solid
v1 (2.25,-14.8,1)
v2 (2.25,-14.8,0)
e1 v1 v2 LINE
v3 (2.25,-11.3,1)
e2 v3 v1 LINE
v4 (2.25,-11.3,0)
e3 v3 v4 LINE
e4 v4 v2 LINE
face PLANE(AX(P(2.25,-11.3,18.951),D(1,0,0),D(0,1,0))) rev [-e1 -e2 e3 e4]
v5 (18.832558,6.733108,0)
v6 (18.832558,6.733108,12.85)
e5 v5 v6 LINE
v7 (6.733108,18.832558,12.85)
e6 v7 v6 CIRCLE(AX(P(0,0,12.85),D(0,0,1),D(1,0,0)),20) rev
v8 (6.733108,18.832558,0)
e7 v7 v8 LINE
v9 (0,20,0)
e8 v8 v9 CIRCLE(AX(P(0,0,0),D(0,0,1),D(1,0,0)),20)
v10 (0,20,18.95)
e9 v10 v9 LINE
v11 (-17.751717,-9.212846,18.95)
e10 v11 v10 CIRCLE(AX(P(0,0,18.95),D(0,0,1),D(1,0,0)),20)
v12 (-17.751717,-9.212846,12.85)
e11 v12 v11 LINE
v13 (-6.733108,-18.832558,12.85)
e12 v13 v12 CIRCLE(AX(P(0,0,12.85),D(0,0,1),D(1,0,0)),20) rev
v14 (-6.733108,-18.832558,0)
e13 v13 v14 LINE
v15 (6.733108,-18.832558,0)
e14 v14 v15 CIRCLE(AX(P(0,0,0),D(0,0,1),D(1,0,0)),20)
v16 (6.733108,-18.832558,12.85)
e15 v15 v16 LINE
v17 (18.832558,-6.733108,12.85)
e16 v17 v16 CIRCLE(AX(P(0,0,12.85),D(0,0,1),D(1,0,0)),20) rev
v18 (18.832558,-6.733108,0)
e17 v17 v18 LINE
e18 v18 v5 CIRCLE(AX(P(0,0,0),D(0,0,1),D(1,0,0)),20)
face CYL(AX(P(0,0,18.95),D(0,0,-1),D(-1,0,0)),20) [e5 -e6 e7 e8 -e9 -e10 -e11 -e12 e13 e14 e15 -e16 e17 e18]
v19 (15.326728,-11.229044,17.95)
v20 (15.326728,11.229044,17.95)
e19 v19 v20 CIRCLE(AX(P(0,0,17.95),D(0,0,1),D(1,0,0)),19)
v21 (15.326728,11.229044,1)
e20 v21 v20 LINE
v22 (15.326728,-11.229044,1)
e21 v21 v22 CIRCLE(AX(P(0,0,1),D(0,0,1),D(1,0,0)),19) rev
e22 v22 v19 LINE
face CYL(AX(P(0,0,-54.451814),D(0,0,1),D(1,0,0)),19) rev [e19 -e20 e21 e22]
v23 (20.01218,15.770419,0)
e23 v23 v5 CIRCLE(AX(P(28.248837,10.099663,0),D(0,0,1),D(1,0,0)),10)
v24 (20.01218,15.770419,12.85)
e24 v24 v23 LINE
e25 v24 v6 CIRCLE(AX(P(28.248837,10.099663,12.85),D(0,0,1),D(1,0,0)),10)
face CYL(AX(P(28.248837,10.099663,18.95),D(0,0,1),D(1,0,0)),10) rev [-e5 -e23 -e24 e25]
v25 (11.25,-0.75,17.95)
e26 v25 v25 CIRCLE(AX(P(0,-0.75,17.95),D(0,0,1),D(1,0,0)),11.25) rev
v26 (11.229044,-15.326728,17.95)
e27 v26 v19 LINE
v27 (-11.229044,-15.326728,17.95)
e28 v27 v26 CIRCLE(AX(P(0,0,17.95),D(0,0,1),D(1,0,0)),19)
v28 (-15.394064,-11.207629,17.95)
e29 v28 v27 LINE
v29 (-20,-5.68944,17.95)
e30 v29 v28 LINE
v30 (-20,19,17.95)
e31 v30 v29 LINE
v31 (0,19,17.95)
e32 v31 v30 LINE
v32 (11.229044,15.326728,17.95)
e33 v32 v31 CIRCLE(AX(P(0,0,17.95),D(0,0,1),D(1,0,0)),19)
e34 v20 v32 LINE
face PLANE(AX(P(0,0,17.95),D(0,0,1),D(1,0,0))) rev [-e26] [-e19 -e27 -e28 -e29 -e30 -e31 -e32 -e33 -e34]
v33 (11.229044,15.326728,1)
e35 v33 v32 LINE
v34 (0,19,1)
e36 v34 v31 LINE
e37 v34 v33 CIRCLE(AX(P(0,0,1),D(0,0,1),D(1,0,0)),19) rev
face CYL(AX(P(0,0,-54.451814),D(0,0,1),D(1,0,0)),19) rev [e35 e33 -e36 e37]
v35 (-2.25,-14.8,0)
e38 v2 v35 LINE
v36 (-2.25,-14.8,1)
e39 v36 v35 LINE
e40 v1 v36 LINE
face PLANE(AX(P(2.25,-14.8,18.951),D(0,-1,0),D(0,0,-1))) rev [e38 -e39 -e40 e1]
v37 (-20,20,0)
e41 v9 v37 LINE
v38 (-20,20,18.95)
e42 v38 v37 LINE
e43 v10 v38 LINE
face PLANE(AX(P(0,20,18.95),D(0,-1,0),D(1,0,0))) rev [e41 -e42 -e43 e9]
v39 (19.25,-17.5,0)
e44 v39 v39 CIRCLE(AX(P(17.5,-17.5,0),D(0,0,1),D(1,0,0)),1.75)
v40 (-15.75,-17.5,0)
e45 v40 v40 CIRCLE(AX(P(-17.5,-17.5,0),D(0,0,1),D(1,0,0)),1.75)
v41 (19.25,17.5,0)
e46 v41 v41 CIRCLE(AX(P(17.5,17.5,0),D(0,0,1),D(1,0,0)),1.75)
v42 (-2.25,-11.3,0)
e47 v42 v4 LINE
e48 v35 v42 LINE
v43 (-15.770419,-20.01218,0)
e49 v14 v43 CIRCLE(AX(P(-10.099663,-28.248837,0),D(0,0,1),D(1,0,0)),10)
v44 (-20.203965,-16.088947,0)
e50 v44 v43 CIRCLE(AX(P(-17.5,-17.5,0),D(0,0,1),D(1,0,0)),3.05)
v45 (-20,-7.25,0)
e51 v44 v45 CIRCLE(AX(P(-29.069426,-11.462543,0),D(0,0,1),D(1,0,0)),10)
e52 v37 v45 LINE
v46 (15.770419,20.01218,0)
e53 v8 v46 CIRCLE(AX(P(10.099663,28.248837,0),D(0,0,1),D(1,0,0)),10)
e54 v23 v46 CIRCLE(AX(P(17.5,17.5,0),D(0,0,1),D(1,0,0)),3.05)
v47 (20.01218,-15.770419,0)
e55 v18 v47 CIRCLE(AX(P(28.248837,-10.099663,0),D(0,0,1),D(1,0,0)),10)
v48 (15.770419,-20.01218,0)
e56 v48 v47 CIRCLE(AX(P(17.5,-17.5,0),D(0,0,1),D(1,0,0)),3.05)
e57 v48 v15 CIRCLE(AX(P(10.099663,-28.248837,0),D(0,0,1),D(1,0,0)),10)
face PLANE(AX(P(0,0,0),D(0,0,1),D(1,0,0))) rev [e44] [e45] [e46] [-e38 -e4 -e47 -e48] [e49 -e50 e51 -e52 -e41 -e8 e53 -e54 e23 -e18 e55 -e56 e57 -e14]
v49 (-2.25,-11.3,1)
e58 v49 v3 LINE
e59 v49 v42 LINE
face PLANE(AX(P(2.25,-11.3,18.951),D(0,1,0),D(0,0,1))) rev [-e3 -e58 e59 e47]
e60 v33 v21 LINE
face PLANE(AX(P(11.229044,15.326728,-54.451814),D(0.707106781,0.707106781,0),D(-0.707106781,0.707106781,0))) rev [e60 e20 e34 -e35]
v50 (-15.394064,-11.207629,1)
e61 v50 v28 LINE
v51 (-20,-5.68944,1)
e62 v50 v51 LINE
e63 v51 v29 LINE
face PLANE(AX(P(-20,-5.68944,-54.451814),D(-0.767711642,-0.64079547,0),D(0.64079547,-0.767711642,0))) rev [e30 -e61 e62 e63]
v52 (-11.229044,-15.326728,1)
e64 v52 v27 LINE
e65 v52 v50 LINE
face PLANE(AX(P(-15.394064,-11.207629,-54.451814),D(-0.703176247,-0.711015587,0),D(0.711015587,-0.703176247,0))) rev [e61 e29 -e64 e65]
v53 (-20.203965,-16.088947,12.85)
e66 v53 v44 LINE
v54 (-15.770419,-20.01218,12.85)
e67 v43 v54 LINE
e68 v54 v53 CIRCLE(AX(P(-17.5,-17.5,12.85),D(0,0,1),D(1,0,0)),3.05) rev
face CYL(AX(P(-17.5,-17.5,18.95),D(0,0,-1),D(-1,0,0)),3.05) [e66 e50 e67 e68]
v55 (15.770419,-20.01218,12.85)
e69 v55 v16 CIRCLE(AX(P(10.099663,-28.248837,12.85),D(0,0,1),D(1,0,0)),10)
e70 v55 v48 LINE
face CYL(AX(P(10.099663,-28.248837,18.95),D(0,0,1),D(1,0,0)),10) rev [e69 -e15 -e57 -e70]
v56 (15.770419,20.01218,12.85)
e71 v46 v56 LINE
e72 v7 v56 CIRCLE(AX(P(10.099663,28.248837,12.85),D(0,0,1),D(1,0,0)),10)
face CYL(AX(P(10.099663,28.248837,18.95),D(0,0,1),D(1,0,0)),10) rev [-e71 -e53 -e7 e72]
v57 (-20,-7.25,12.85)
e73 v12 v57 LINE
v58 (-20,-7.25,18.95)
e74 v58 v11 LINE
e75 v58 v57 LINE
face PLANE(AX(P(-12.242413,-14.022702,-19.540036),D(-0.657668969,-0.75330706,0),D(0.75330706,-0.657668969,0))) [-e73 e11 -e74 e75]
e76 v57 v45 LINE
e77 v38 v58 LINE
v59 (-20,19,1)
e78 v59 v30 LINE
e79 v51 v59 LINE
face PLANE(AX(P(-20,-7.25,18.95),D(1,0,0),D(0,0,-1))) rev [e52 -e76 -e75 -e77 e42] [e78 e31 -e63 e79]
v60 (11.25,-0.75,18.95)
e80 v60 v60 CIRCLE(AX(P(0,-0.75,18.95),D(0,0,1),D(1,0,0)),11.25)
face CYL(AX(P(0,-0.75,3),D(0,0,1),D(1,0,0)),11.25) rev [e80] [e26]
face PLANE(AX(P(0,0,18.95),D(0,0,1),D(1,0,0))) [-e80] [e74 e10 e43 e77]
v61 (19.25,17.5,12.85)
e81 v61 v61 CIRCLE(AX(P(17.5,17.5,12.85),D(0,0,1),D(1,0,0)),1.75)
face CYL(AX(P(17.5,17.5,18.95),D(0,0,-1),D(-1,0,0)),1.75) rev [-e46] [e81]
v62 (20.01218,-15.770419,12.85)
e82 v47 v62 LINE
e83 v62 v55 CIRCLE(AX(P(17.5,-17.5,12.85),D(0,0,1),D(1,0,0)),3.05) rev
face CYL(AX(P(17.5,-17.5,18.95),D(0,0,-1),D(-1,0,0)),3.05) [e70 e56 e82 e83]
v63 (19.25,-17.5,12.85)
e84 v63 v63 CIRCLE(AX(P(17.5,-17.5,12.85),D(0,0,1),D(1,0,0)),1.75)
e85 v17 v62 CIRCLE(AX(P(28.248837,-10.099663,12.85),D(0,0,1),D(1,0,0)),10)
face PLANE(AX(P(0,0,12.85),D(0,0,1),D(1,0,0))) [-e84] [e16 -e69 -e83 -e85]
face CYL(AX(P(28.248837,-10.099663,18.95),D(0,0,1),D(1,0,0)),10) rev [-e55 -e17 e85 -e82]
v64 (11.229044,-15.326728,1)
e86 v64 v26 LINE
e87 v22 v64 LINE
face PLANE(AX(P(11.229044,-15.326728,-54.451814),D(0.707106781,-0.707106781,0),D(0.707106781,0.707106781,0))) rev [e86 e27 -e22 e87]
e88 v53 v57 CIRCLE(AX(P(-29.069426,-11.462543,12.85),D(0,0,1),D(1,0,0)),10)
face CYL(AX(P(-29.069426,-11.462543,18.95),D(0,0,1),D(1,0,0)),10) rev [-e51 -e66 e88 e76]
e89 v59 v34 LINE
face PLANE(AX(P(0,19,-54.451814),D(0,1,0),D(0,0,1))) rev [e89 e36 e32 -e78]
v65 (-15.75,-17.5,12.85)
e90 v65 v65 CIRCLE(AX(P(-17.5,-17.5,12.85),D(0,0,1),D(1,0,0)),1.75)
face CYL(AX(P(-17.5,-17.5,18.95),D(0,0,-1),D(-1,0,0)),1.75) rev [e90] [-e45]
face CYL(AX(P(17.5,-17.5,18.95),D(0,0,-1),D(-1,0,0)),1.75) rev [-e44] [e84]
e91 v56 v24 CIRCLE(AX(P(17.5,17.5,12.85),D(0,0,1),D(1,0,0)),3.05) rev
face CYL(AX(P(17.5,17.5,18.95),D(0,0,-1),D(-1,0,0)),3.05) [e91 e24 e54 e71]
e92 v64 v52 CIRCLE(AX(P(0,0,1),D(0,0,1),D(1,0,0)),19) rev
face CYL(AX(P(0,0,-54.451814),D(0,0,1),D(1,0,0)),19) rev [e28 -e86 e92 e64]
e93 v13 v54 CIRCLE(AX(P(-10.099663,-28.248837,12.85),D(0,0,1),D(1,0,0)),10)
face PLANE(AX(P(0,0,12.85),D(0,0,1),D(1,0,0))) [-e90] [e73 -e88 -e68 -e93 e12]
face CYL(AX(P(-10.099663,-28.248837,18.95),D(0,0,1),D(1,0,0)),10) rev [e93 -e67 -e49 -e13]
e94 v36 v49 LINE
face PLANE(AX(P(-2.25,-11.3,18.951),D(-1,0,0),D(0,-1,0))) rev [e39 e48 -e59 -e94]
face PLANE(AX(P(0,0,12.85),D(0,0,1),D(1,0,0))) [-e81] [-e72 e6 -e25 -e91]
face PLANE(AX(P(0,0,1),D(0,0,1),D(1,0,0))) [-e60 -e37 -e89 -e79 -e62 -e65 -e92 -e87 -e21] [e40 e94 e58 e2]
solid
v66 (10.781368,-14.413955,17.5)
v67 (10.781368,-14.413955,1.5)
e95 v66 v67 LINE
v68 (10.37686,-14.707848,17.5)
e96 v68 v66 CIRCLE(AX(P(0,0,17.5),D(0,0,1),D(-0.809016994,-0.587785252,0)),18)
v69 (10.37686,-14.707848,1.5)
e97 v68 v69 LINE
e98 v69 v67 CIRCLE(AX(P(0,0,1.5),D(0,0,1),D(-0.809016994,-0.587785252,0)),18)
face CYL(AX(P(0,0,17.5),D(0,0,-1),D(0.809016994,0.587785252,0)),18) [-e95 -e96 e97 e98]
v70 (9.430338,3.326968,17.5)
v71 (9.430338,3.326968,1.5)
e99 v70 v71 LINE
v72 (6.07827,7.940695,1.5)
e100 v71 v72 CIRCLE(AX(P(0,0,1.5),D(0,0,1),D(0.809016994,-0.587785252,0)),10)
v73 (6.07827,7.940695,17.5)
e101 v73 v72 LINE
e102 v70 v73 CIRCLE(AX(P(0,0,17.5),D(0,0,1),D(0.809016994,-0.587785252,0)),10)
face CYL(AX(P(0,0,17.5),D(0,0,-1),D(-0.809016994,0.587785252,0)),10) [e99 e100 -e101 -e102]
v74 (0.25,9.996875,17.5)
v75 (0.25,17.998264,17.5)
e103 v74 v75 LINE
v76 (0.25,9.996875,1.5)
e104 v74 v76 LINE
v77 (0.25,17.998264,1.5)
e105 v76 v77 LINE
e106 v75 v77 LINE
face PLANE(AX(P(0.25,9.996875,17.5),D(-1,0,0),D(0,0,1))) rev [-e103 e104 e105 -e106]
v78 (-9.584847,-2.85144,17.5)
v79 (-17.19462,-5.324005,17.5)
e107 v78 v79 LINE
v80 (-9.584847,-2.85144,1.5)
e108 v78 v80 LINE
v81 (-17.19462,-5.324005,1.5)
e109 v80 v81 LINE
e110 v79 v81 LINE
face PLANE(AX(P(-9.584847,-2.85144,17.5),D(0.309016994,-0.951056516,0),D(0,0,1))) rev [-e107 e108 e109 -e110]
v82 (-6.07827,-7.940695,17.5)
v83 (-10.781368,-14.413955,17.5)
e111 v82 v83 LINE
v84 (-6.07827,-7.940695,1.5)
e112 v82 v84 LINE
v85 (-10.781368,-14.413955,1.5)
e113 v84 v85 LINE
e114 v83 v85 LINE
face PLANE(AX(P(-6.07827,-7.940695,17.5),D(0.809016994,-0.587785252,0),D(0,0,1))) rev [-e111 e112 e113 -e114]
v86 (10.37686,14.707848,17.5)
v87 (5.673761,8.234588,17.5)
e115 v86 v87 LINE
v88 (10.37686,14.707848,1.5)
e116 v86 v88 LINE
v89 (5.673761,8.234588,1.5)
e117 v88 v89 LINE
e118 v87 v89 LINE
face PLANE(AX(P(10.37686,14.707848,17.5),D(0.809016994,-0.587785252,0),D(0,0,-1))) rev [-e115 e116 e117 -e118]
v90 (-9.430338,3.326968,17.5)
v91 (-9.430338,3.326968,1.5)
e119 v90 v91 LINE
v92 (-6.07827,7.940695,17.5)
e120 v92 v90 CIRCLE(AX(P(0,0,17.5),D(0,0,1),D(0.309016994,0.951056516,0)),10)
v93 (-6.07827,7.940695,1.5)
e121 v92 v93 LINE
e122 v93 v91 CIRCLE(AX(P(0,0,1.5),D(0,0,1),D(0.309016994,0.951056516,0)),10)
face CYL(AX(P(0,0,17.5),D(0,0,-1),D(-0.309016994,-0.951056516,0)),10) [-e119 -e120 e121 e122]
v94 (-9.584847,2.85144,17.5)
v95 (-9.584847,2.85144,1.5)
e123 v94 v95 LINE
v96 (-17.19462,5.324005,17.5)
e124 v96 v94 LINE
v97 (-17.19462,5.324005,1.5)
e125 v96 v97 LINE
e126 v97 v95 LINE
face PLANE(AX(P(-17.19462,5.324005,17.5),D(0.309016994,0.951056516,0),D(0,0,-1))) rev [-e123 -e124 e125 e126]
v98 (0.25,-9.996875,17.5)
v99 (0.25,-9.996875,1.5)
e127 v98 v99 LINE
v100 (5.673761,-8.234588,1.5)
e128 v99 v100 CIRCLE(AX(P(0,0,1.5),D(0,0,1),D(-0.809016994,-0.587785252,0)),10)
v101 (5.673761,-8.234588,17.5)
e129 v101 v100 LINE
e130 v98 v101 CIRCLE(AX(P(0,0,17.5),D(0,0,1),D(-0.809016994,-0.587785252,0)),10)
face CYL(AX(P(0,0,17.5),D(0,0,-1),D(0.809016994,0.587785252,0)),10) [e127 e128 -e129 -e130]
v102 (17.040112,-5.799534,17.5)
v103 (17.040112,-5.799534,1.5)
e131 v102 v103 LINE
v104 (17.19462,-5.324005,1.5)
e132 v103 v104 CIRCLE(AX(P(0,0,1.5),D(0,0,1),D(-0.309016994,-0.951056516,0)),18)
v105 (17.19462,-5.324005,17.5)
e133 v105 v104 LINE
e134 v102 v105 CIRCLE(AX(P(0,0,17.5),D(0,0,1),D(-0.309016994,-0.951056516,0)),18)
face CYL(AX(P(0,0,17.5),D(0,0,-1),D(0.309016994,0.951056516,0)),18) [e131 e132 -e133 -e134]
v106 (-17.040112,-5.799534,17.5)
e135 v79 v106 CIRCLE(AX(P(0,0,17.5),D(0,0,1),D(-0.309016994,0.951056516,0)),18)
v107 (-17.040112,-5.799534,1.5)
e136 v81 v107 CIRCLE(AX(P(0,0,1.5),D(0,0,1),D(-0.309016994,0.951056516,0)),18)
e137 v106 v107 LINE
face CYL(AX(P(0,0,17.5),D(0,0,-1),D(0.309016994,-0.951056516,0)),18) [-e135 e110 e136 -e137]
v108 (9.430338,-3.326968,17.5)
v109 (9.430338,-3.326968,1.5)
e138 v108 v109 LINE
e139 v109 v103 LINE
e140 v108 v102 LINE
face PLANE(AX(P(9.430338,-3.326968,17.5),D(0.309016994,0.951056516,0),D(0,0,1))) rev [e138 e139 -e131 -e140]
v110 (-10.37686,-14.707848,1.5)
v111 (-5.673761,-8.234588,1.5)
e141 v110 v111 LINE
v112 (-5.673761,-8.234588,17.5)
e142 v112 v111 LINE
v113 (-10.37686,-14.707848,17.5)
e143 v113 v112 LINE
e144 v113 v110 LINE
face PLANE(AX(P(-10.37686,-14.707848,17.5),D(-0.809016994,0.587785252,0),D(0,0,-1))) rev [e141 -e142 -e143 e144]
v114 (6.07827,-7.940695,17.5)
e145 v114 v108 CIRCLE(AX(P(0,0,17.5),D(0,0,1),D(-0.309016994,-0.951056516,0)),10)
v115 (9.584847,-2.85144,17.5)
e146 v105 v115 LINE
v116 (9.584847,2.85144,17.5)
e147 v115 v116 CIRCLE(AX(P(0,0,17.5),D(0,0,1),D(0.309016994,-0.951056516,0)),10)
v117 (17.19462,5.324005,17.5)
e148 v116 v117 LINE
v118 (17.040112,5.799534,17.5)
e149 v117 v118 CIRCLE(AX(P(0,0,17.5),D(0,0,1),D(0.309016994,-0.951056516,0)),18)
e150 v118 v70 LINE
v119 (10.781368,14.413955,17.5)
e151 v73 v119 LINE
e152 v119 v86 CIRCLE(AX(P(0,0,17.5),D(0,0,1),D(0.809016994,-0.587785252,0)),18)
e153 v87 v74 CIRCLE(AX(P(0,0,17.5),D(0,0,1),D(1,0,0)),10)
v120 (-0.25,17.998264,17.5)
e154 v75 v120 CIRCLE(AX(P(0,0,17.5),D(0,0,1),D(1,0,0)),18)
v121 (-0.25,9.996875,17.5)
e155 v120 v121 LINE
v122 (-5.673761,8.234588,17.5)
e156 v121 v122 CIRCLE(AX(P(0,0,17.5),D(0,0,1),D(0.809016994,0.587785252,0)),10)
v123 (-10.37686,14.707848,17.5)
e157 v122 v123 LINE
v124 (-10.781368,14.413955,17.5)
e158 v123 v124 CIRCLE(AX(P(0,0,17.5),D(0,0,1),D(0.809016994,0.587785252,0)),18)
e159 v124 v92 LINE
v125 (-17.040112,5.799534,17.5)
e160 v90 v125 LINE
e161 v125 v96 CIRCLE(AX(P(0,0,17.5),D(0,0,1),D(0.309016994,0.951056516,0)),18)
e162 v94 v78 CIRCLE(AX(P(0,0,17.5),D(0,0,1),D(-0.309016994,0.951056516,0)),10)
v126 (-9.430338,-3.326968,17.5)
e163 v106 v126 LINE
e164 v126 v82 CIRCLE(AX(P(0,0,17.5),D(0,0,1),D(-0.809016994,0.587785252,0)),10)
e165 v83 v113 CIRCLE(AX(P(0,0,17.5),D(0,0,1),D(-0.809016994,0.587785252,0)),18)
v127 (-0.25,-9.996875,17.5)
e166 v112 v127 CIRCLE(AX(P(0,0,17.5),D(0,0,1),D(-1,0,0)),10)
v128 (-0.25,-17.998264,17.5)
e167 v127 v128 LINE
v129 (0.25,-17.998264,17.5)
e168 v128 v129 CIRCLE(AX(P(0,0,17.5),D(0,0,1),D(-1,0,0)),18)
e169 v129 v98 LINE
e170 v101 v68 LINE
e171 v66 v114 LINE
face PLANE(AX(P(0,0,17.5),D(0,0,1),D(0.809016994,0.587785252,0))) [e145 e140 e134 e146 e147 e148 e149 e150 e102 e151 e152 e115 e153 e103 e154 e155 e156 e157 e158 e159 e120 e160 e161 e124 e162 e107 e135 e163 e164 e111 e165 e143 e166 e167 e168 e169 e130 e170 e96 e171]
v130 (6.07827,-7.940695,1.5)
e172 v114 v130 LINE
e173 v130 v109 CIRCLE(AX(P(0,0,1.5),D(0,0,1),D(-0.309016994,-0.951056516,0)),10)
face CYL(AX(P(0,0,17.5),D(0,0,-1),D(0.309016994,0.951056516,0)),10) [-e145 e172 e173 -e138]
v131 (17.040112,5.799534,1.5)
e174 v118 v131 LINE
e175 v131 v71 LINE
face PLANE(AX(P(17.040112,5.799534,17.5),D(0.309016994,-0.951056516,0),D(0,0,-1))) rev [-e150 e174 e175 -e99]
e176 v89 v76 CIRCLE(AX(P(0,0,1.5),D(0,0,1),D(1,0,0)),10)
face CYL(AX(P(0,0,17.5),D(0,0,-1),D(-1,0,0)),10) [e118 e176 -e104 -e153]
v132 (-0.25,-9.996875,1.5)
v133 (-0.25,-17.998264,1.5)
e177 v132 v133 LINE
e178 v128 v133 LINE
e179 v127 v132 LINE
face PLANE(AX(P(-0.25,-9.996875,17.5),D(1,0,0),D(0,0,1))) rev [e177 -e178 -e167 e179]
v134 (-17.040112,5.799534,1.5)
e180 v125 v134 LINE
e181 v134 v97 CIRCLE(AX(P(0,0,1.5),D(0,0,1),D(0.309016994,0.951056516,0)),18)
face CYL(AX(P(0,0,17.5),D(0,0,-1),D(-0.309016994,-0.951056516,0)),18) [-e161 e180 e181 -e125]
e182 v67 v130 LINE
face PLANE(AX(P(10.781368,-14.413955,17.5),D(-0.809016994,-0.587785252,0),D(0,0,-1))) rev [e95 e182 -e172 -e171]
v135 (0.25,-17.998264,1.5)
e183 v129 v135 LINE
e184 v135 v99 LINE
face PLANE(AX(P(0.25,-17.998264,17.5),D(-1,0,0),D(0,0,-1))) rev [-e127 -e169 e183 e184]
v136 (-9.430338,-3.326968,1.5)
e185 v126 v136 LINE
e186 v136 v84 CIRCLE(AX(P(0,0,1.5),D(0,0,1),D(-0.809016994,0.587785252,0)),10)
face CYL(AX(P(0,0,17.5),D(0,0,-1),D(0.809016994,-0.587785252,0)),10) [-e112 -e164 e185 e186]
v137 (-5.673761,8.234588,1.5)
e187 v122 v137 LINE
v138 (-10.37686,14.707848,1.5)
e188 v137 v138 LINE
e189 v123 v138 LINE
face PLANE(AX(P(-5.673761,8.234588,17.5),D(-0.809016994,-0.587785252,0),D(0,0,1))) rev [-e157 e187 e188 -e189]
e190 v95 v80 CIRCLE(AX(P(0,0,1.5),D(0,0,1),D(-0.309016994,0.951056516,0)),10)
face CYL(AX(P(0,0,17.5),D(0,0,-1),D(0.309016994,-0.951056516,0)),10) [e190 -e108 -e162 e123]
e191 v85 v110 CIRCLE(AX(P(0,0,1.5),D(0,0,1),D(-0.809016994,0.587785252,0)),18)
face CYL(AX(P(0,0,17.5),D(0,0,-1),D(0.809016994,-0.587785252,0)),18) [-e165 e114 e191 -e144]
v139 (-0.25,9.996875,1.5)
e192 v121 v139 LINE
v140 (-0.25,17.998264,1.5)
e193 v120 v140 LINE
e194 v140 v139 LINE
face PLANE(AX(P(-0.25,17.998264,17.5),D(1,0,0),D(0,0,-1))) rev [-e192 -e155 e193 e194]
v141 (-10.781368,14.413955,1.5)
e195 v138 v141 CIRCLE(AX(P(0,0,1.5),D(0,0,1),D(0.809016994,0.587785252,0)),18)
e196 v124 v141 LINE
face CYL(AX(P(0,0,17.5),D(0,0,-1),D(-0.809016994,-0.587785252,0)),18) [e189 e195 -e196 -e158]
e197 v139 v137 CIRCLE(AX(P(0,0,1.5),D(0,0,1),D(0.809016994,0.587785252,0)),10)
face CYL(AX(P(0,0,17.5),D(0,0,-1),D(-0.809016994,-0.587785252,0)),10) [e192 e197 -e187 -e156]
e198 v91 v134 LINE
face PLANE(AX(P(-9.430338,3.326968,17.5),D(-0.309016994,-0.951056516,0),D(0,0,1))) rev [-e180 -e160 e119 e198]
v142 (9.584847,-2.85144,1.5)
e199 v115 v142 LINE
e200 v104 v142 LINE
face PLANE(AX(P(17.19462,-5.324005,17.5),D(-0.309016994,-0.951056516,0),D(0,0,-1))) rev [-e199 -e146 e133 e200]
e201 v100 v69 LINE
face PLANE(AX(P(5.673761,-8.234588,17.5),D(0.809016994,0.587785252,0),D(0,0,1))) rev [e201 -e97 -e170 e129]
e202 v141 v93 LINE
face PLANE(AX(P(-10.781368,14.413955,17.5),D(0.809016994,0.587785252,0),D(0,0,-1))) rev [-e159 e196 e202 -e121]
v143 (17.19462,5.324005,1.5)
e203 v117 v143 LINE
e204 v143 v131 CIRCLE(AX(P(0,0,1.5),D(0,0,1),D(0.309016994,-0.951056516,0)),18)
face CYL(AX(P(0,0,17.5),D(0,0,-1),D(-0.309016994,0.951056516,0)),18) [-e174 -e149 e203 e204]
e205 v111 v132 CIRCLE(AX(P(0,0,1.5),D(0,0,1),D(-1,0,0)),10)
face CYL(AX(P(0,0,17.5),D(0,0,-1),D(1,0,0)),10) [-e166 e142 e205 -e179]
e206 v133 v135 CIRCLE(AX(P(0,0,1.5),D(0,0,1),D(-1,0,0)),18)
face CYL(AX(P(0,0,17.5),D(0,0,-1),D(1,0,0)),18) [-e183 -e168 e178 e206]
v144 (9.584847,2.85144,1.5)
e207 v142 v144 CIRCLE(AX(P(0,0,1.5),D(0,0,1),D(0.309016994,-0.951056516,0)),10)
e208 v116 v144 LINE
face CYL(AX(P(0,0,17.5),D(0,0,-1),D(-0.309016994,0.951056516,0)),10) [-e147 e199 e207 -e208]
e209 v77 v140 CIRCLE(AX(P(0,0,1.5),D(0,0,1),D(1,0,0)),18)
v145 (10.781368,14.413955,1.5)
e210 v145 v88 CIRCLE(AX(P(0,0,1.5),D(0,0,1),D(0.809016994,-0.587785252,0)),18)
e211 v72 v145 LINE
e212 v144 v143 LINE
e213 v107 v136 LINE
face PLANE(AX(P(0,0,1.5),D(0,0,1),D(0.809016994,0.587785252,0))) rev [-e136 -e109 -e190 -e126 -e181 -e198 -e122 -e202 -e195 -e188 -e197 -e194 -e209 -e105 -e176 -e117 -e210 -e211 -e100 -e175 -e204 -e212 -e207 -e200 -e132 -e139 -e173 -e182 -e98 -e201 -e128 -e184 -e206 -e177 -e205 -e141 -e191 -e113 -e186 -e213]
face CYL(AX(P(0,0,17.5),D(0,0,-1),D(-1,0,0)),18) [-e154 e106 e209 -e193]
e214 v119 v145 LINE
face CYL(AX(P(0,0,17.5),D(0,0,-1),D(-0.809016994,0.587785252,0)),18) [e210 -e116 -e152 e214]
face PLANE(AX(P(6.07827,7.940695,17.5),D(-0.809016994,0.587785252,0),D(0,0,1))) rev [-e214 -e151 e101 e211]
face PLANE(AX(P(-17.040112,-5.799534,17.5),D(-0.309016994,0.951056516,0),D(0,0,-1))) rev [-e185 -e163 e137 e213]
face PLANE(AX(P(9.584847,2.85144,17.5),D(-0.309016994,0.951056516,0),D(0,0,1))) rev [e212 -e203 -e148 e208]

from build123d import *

# Parameters (mm, degrees)
CROQUIS1_R              = 1.75
SALIENTE_EXTRUIR1_DEPTH = 18.95
CROQUIS2_R              = 11.25
CORTAR_EXTRUIR1_DEPTH   = 15.95
CORTAR_EXTRUIR2_DEPTH   = 16.95
REDONDEO1_R             = 10
CORTAR_EXTRUIR3_START   = -6.1
CROQUIS4_R              = 1.75
CORTAR_EXTRUIR3_DEPTH   = 6.1
CORTAR_EXTRUIR4_REACH   = 36.694
CROQUIS7_W              = 4.5
CROQUIS7_H              = 3.5
SALIENTE_EXTRUIR2_START = 0.5
SALIENTE_EXTRUIR2_DEPTH = 16
MATRIZC1_COUNT          = 10


with BuildPart() as part:
    # Croquis1 → Saliente-Extruir1 (new body)
    with BuildSketch(Plane.XY):
        with BuildLine():
            Line((0, 20), (-20, 20))
            Line((-20, 20), (-20, -7.25))
            Line((-20, -7.25), (-16.161775697, -11.848424332))
            Line((-16.161775697, -11.848424332), (-19.656675683, -15.343324317))
            ThreePointArc((-19.656675683, -15.343324317), (-19.656675683, -19.656675683), (-15.343324317, -19.656675683))
            Line((-15.343324317, -19.656675683), (-11.820046036, -16.133397401))
            ThreePointArc((-11.820046036, -16.133397401), (0, -20), (11.820046036, -16.133397401))
            Line((11.820046036, -16.133397401), (15.343324317, -19.656675683))
            ThreePointArc((15.343324317, -19.656675683), (19.656675683, -19.656675683), (19.656675683, -15.343324317))
            Line((19.656675683, -15.343324317), (16.133397401, -11.820046036))
            ThreePointArc((16.133397401, -11.820046036), (20, 0), (16.133397401, 11.820046036))
            Line((16.133397401, 11.820046036), (19.656675683, 15.343324317))
            ThreePointArc((19.656675683, 15.343324317), (19.656675683, 19.656675683), (15.343324317, 19.656675683))
            Line((15.343324317, 19.656675683), (11.820046036, 16.133397401))
            ThreePointArc((11.820046036, 16.133397401), (6.218201186, 19.008786758), (0, 20))
        make_face()
        with Locations((17.5, 17.5)):
            Circle(CROQUIS1_R, mode=Mode.SUBTRACT)
        with Locations((17.5, -17.5)):
            Circle(CROQUIS1_R, mode=Mode.SUBTRACT)
        with Locations((-17.5, -17.5)):
            Circle(CROQUIS1_R, mode=Mode.SUBTRACT)
    extrude(amount=SALIENTE_EXTRUIR1_DEPTH)

    # Croquis2 → Cortar-Extruir1 (cut)
    with BuildSketch(Plane.XY.offset(18.95)):
        with Locations((0, -0.75)):
            Circle(CROQUIS2_R)
    extrude(amount=-CORTAR_EXTRUIR1_DEPTH, mode=Mode.SUBTRACT)

    # Croquis3 → Cortar-Extruir2 (cut)
    with BuildSketch(Plane.XY.offset(17.95)):
        with BuildLine():
            Line((-20, 19), (-20, -5.689439655))
            Line((-20, -5.689439655), (-15.394064055, -11.207628862))
            Line((-15.394064055, -11.207628862), (-11.229043734, -15.326727531))
            ThreePointArc((-11.229043734, -15.326727531), (0, -19), (11.229043734, -15.326727531))
            Line((11.229043734, -15.326727531), (15.326727531, -11.229043734))
            ThreePointArc((15.326727531, -11.229043734), (19, 0), (15.326727531, 11.229043734))
            Line((15.326727531, 11.229043734), (11.229043734, 15.326727531))
            ThreePointArc((11.229043734, 15.326727531), (5.907291127, 18.05834742), (0, 19))
            Line((0, 19), (-20, 19))
        make_face()
    extrude(amount=-CORTAR_EXTRUIR2_DEPTH, mode=Mode.SUBTRACT)

    # Redondeo1
    # the kernel refuses this fillet: 10 mm, written as the material it adds along each edge
    with BuildSketch(Plane(origin=(11.820046036, 16.133397401, 0), x_dir=(0.7135427704128318, 0.700611671892198, 0), z_dir=(0, 0, 1)), Plane(origin=(-11.820046036, -16.133397401, 0), x_dir=(-0.7135427704128318, -0.7006116718921981, 0), z_dir=(0, 0, 1)), Plane(origin=(16.133397401, -11.820046036, 0), x_dir=(0.700611671892198, -0.7135427704128318, 0), z_dir=(0, 0, 1))) as redondeo1_piece_1:
        with BuildLine():
            CenterArc((7.26065151, 9.850205373), REDONDEO1_R, 205.850666245, 54.219788289)
            Line((-1.738683967, 5.489934627), (-2.638617515, 5.053907553))
            ThreePointArc((-2.638617515, 5.053907553), (-1.624046999, 2.505949256), (-0.986867746, -0.161530343))
            Line((-0.986867746, -0.161530343), (0.009143667, -0.999958196))
            ThreePointArc((0.009143667, -0.999958196), (4.991603301, -0.954398337), (5.363843801, -0.985020537))
            Line((5.363843801, -0.985020537), (5.536280865, 0))
        make_face()
    extrude(amount=18.95)
    with BuildSketch(Plane(origin=(-16.161775697, -11.848424332, 0), x_dir=(-0.6407954702389175, 0.7677116420383924, 0), z_dir=(0, 0, 1))) as redondeo1_piece_2_section:
        with BuildLine():
            CenterArc((8.567409361, 9.662082083), REDONDEO1_R, 202.59121969, 52.471420127)
            Line((-0.665281617, 5.820543678), (-1.588550714, 5.436389838))
            ThreePointArc((-1.588550714, 5.436389838), (-1.439524257, 4.832848201), (-0.99596493, -0.089743286))
            Line((-0.99596493, -0.089743286), (0, -1))
            ThreePointArc((0, -1), (2.994890321, -1), (5.73201777, -0.966208208))
            Line((5.73201777, -0.966208208), (5.989780642, 0))
        make_face()
    redondeo1_piece_2 = extrude(amount=18.95, mode=Mode.PRIVATE)
    redondeo1_piece_2 = split(redondeo1_piece_2, bisect_by=Plane(origin=(-17.114557991, -9.506104322, 0.5), z_dir=(-0.7031762473130518, -0.7110155871812753, 0)), keep=Keep.TOP, mode=Mode.PRIVATE)
    add(redondeo1_piece_2)
    with BuildSketch(Plane(origin=(11.820046036, -16.133397401, 0), x_dir=(-0.8833512154109235, -0.4687116706804344, 0), z_dir=(0, 0, 1))) as redondeo1_piece_3:
        with BuildLine():
            CenterArc((7.198350956, 9.895824864), REDONDEO1_R, 207.502745576, 54.219788289)
            Line((-1.671536099, 5.277913687), (-2.558524804, 4.81612257))
            ThreePointArc((-2.558524804, 4.81612257), (-2.416943338, 4.470499368), (-0.956052835, -0.293194434))
            Line((-0.956052835, -0.293194434), (0.143967019, -0.989582486))
            ThreePointArc((0.143967019, -0.989582486), (2.879340382, -0.791649728), (5.614713746, -0.989582486))
            Line((5.614713746, -0.989582486), (5.758680765, 0))
        make_face()
    extrude(amount=18.95)
    with BuildSketch(Plane(origin=(16.133397401, 11.820046036, 0), x_dir=(0.7006116718921972, 0.7135427704128325, 0), z_dir=(0, 0, 1))) as redondeo1_piece_4:
        with BuildLine():
            CenterArc((7.26065151, -9.850205373), REDONDEO1_R, 99.929545466, 54.219788289)
            Line((-1.738683967, -5.489934627), (-2.638617515, -5.053907553))
            ThreePointArc((-2.638617515, -5.053907553), (-1.624046999, -2.505949256), (-0.986867746, 0.161530343))
            Line((-0.986867746, 0.161530343), (0.009143667, 0.999958196))
            ThreePointArc((0.009143667, 0.999958196), (4.991603301, 0.954398337), (5.363843801, 0.985020537))
            Line((5.363843801, 0.985020537), (5.536280865, 0))
        make_face()
    extrude(amount=18.95)

    # Croquis4 → Cortar-Extruir3 (cut)
    # profile 1 of 3: a face of its own
    with BuildSketch(Plane.XY.offset(18.95).offset(CORTAR_EXTRUIR3_START)):
        with BuildLine():
            Line((-17.751717357, -9.21284597), (-20, -7.25))
            ThreePointArc((-20, -7.25), (-19.072087099, -11.69323902), (-20.203965396, -16.088946798))
            ThreePointArc((-20.203965396, -16.088946798), (-19.521211718, -19.784119785), (-15.770419222, -20.012180394))
            ThreePointArc((-15.770419222, -20.012180394), (-11.393963282, -18.332951904), (-6.733108383, -18.832558283))
            ThreePointArc((-6.733108383, -18.832558283), (-13.153379381, -15.066141207), (-17.751717357, -9.21284597))
        make_face()
        with Locations((-17.5, -17.5)):
            Circle(CROQUIS4_R, mode=Mode.SUBTRACT)
    # profile 2 of 3: a face of its own
    with BuildSketch(Plane.XY.offset(18.95).offset(CORTAR_EXTRUIR3_START)):
        with BuildLine():
            ThreePointArc((18.832558283, -6.733108383), (14.142135624, -14.142135624), (6.733108383, -18.832558283))
            ThreePointArc((6.733108383, -18.832558283), (11.393963282, -18.332951904), (15.770419222, -20.012180394))
            ThreePointArc((15.770419222, -20.012180394), (19.656675683, -19.656675683), (20.012180394, -15.770419222))
            ThreePointArc((20.012180394, -15.770419222), (18.332951904, -11.393963282), (18.832558283, -6.733108383))
        make_face()
        with Locations((17.5, -17.5)):
            Circle(CROQUIS4_R, mode=Mode.SUBTRACT)
    # profile 3 of 3: a face of its own
    with BuildSketch(Plane.XY.offset(18.95).offset(CORTAR_EXTRUIR3_START)):
        with BuildLine():
            ThreePointArc((15.770419222, 20.012180394), (11.393963282, 18.332951904), (6.733108383, 18.832558283))
            ThreePointArc((6.733108383, 18.832558283), (14.142135624, 14.142135624), (18.832558283, 6.733108383))
            ThreePointArc((18.832558283, 6.733108383), (18.332951904, 11.393963282), (20.012180394, 15.770419222))
            ThreePointArc((20.012180394, 15.770419222), (19.656675683, 19.656675683), (15.770419222, 20.012180394))
        make_face()
        with Locations((17.5, 17.5)):
            Circle(CROQUIS4_R, mode=Mode.SUBTRACT)
    extrude(amount=CORTAR_EXTRUIR3_DEPTH, mode=Mode.SUBTRACT)

    # Croquis7 → Cortar-Extruir4 (cut, up to next)
    with BuildSketch(Plane(origin=(0, 0, 0), x_dir=(-1, 0, 0), z_dir=(0, 0, -1)), mode=Mode.PRIVATE) as cortar_extruir4_sk1:
        with Locations((0, -13.05)):
            Rectangle(CROQUIS7_W, CROQUIS7_H)
    cortar_extruir4_tool1 = extrude(cortar_extruir4_sk1.sketch, amount=-CORTAR_EXTRUIR4_REACH, mode=Mode.PRIVATE) & part.part
    add(cortar_extruir4_tool1.solids().sort_by_distance((0, -13.05, 0))[0], mode=Mode.SUBTRACT)


with BuildPart() as body_2:
    # Croquis8 → Saliente-Extruir2 (new body)
    with BuildSketch(Plane.XY.offset(1).offset(SALIENTE_EXTRUIR2_START)):
        with BuildLine():
            Line((-0.25, 17.998263805), (-0.25, 9.996874512))
            Line((-0.25, 9.996874512), (0, 0))
            Line((0, 0), (5.673761158, 8.234587684))
            ThreePointArc((5.673761158, 8.234587684), (3.090169944, 9.510565163), (0.25, 9.996874512))
            Line((0.25, 9.996874512), (0.25, 17.998263805))
            ThreePointArc((0.25, 17.998263805), (0, 18), (-0.25, 17.998263805))
        make_face()
    extrude(amount=SALIENTE_EXTRUIR2_DEPTH)


with BuildPart() as matrizc1_1:
    # MatrizC1: pattern copy
    add(body_2.part.rotate(Axis((0, 0, 0), (0, 0, 1)), 1 * 360 / MATRIZC1_COUNT))


with BuildPart() as matrizc1_2:
    # MatrizC1: pattern copy
    add(body_2.part.rotate(Axis((0, 0, 0), (0, 0, 1)), 2 * 360 / MATRIZC1_COUNT))


with BuildPart() as matrizc1_3:
    # MatrizC1: pattern copy
    add(body_2.part.rotate(Axis((0, 0, 0), (0, 0, 1)), 3 * 360 / MATRIZC1_COUNT))


with BuildPart() as matrizc1_4:
    # MatrizC1: pattern copy
    add(body_2.part.rotate(Axis((0, 0, 0), (0, 0, 1)), 4 * 360 / MATRIZC1_COUNT))


with BuildPart() as matrizc1_5:
    # MatrizC1: pattern copy
    add(body_2.part.rotate(Axis((0, 0, 0), (0, 0, 1)), 5 * 360 / MATRIZC1_COUNT))


with BuildPart() as matrizc1_6:
    # MatrizC1: pattern copy
    add(body_2.part.rotate(Axis((0, 0, 0), (0, 0, 1)), 6 * 360 / MATRIZC1_COUNT))


with BuildPart() as matrizc1_7:
    # MatrizC1: pattern copy
    add(body_2.part.rotate(Axis((0, 0, 0), (0, 0, 1)), 7 * 360 / MATRIZC1_COUNT))


with BuildPart() as matrizc1_8:
    # MatrizC1: pattern copy
    add(body_2.part.rotate(Axis((0, 0, 0), (0, 0, 1)), 8 * 360 / MATRIZC1_COUNT))


with BuildPart() as matrizc1_9:
    # MatrizC1: pattern copy
    add(body_2.part.rotate(Axis((0, 0, 0), (0, 0, 1)), 9 * 360 / MATRIZC1_COUNT))


with BuildPart() as matrizc1_1_1:
    add(matrizc1_1.part)

    # Combinar1: union body 2, MatrizC1_9, MatrizC1_8, MatrizC1_7, MatrizC1_6, MatrizC1_5, MatrizC1_4, MatrizC1_3, MatrizC1_2
    add(body_2.part)
    add(matrizc1_9.part)
    add(matrizc1_8.part)
    add(matrizc1_7.part)
    add(matrizc1_6.part)
    add(matrizc1_5.part)
    add(matrizc1_4.part)
    add(matrizc1_3.part)
    add(matrizc1_2.part)


solid = Compound([part.part, matrizc1_1_1.part])
